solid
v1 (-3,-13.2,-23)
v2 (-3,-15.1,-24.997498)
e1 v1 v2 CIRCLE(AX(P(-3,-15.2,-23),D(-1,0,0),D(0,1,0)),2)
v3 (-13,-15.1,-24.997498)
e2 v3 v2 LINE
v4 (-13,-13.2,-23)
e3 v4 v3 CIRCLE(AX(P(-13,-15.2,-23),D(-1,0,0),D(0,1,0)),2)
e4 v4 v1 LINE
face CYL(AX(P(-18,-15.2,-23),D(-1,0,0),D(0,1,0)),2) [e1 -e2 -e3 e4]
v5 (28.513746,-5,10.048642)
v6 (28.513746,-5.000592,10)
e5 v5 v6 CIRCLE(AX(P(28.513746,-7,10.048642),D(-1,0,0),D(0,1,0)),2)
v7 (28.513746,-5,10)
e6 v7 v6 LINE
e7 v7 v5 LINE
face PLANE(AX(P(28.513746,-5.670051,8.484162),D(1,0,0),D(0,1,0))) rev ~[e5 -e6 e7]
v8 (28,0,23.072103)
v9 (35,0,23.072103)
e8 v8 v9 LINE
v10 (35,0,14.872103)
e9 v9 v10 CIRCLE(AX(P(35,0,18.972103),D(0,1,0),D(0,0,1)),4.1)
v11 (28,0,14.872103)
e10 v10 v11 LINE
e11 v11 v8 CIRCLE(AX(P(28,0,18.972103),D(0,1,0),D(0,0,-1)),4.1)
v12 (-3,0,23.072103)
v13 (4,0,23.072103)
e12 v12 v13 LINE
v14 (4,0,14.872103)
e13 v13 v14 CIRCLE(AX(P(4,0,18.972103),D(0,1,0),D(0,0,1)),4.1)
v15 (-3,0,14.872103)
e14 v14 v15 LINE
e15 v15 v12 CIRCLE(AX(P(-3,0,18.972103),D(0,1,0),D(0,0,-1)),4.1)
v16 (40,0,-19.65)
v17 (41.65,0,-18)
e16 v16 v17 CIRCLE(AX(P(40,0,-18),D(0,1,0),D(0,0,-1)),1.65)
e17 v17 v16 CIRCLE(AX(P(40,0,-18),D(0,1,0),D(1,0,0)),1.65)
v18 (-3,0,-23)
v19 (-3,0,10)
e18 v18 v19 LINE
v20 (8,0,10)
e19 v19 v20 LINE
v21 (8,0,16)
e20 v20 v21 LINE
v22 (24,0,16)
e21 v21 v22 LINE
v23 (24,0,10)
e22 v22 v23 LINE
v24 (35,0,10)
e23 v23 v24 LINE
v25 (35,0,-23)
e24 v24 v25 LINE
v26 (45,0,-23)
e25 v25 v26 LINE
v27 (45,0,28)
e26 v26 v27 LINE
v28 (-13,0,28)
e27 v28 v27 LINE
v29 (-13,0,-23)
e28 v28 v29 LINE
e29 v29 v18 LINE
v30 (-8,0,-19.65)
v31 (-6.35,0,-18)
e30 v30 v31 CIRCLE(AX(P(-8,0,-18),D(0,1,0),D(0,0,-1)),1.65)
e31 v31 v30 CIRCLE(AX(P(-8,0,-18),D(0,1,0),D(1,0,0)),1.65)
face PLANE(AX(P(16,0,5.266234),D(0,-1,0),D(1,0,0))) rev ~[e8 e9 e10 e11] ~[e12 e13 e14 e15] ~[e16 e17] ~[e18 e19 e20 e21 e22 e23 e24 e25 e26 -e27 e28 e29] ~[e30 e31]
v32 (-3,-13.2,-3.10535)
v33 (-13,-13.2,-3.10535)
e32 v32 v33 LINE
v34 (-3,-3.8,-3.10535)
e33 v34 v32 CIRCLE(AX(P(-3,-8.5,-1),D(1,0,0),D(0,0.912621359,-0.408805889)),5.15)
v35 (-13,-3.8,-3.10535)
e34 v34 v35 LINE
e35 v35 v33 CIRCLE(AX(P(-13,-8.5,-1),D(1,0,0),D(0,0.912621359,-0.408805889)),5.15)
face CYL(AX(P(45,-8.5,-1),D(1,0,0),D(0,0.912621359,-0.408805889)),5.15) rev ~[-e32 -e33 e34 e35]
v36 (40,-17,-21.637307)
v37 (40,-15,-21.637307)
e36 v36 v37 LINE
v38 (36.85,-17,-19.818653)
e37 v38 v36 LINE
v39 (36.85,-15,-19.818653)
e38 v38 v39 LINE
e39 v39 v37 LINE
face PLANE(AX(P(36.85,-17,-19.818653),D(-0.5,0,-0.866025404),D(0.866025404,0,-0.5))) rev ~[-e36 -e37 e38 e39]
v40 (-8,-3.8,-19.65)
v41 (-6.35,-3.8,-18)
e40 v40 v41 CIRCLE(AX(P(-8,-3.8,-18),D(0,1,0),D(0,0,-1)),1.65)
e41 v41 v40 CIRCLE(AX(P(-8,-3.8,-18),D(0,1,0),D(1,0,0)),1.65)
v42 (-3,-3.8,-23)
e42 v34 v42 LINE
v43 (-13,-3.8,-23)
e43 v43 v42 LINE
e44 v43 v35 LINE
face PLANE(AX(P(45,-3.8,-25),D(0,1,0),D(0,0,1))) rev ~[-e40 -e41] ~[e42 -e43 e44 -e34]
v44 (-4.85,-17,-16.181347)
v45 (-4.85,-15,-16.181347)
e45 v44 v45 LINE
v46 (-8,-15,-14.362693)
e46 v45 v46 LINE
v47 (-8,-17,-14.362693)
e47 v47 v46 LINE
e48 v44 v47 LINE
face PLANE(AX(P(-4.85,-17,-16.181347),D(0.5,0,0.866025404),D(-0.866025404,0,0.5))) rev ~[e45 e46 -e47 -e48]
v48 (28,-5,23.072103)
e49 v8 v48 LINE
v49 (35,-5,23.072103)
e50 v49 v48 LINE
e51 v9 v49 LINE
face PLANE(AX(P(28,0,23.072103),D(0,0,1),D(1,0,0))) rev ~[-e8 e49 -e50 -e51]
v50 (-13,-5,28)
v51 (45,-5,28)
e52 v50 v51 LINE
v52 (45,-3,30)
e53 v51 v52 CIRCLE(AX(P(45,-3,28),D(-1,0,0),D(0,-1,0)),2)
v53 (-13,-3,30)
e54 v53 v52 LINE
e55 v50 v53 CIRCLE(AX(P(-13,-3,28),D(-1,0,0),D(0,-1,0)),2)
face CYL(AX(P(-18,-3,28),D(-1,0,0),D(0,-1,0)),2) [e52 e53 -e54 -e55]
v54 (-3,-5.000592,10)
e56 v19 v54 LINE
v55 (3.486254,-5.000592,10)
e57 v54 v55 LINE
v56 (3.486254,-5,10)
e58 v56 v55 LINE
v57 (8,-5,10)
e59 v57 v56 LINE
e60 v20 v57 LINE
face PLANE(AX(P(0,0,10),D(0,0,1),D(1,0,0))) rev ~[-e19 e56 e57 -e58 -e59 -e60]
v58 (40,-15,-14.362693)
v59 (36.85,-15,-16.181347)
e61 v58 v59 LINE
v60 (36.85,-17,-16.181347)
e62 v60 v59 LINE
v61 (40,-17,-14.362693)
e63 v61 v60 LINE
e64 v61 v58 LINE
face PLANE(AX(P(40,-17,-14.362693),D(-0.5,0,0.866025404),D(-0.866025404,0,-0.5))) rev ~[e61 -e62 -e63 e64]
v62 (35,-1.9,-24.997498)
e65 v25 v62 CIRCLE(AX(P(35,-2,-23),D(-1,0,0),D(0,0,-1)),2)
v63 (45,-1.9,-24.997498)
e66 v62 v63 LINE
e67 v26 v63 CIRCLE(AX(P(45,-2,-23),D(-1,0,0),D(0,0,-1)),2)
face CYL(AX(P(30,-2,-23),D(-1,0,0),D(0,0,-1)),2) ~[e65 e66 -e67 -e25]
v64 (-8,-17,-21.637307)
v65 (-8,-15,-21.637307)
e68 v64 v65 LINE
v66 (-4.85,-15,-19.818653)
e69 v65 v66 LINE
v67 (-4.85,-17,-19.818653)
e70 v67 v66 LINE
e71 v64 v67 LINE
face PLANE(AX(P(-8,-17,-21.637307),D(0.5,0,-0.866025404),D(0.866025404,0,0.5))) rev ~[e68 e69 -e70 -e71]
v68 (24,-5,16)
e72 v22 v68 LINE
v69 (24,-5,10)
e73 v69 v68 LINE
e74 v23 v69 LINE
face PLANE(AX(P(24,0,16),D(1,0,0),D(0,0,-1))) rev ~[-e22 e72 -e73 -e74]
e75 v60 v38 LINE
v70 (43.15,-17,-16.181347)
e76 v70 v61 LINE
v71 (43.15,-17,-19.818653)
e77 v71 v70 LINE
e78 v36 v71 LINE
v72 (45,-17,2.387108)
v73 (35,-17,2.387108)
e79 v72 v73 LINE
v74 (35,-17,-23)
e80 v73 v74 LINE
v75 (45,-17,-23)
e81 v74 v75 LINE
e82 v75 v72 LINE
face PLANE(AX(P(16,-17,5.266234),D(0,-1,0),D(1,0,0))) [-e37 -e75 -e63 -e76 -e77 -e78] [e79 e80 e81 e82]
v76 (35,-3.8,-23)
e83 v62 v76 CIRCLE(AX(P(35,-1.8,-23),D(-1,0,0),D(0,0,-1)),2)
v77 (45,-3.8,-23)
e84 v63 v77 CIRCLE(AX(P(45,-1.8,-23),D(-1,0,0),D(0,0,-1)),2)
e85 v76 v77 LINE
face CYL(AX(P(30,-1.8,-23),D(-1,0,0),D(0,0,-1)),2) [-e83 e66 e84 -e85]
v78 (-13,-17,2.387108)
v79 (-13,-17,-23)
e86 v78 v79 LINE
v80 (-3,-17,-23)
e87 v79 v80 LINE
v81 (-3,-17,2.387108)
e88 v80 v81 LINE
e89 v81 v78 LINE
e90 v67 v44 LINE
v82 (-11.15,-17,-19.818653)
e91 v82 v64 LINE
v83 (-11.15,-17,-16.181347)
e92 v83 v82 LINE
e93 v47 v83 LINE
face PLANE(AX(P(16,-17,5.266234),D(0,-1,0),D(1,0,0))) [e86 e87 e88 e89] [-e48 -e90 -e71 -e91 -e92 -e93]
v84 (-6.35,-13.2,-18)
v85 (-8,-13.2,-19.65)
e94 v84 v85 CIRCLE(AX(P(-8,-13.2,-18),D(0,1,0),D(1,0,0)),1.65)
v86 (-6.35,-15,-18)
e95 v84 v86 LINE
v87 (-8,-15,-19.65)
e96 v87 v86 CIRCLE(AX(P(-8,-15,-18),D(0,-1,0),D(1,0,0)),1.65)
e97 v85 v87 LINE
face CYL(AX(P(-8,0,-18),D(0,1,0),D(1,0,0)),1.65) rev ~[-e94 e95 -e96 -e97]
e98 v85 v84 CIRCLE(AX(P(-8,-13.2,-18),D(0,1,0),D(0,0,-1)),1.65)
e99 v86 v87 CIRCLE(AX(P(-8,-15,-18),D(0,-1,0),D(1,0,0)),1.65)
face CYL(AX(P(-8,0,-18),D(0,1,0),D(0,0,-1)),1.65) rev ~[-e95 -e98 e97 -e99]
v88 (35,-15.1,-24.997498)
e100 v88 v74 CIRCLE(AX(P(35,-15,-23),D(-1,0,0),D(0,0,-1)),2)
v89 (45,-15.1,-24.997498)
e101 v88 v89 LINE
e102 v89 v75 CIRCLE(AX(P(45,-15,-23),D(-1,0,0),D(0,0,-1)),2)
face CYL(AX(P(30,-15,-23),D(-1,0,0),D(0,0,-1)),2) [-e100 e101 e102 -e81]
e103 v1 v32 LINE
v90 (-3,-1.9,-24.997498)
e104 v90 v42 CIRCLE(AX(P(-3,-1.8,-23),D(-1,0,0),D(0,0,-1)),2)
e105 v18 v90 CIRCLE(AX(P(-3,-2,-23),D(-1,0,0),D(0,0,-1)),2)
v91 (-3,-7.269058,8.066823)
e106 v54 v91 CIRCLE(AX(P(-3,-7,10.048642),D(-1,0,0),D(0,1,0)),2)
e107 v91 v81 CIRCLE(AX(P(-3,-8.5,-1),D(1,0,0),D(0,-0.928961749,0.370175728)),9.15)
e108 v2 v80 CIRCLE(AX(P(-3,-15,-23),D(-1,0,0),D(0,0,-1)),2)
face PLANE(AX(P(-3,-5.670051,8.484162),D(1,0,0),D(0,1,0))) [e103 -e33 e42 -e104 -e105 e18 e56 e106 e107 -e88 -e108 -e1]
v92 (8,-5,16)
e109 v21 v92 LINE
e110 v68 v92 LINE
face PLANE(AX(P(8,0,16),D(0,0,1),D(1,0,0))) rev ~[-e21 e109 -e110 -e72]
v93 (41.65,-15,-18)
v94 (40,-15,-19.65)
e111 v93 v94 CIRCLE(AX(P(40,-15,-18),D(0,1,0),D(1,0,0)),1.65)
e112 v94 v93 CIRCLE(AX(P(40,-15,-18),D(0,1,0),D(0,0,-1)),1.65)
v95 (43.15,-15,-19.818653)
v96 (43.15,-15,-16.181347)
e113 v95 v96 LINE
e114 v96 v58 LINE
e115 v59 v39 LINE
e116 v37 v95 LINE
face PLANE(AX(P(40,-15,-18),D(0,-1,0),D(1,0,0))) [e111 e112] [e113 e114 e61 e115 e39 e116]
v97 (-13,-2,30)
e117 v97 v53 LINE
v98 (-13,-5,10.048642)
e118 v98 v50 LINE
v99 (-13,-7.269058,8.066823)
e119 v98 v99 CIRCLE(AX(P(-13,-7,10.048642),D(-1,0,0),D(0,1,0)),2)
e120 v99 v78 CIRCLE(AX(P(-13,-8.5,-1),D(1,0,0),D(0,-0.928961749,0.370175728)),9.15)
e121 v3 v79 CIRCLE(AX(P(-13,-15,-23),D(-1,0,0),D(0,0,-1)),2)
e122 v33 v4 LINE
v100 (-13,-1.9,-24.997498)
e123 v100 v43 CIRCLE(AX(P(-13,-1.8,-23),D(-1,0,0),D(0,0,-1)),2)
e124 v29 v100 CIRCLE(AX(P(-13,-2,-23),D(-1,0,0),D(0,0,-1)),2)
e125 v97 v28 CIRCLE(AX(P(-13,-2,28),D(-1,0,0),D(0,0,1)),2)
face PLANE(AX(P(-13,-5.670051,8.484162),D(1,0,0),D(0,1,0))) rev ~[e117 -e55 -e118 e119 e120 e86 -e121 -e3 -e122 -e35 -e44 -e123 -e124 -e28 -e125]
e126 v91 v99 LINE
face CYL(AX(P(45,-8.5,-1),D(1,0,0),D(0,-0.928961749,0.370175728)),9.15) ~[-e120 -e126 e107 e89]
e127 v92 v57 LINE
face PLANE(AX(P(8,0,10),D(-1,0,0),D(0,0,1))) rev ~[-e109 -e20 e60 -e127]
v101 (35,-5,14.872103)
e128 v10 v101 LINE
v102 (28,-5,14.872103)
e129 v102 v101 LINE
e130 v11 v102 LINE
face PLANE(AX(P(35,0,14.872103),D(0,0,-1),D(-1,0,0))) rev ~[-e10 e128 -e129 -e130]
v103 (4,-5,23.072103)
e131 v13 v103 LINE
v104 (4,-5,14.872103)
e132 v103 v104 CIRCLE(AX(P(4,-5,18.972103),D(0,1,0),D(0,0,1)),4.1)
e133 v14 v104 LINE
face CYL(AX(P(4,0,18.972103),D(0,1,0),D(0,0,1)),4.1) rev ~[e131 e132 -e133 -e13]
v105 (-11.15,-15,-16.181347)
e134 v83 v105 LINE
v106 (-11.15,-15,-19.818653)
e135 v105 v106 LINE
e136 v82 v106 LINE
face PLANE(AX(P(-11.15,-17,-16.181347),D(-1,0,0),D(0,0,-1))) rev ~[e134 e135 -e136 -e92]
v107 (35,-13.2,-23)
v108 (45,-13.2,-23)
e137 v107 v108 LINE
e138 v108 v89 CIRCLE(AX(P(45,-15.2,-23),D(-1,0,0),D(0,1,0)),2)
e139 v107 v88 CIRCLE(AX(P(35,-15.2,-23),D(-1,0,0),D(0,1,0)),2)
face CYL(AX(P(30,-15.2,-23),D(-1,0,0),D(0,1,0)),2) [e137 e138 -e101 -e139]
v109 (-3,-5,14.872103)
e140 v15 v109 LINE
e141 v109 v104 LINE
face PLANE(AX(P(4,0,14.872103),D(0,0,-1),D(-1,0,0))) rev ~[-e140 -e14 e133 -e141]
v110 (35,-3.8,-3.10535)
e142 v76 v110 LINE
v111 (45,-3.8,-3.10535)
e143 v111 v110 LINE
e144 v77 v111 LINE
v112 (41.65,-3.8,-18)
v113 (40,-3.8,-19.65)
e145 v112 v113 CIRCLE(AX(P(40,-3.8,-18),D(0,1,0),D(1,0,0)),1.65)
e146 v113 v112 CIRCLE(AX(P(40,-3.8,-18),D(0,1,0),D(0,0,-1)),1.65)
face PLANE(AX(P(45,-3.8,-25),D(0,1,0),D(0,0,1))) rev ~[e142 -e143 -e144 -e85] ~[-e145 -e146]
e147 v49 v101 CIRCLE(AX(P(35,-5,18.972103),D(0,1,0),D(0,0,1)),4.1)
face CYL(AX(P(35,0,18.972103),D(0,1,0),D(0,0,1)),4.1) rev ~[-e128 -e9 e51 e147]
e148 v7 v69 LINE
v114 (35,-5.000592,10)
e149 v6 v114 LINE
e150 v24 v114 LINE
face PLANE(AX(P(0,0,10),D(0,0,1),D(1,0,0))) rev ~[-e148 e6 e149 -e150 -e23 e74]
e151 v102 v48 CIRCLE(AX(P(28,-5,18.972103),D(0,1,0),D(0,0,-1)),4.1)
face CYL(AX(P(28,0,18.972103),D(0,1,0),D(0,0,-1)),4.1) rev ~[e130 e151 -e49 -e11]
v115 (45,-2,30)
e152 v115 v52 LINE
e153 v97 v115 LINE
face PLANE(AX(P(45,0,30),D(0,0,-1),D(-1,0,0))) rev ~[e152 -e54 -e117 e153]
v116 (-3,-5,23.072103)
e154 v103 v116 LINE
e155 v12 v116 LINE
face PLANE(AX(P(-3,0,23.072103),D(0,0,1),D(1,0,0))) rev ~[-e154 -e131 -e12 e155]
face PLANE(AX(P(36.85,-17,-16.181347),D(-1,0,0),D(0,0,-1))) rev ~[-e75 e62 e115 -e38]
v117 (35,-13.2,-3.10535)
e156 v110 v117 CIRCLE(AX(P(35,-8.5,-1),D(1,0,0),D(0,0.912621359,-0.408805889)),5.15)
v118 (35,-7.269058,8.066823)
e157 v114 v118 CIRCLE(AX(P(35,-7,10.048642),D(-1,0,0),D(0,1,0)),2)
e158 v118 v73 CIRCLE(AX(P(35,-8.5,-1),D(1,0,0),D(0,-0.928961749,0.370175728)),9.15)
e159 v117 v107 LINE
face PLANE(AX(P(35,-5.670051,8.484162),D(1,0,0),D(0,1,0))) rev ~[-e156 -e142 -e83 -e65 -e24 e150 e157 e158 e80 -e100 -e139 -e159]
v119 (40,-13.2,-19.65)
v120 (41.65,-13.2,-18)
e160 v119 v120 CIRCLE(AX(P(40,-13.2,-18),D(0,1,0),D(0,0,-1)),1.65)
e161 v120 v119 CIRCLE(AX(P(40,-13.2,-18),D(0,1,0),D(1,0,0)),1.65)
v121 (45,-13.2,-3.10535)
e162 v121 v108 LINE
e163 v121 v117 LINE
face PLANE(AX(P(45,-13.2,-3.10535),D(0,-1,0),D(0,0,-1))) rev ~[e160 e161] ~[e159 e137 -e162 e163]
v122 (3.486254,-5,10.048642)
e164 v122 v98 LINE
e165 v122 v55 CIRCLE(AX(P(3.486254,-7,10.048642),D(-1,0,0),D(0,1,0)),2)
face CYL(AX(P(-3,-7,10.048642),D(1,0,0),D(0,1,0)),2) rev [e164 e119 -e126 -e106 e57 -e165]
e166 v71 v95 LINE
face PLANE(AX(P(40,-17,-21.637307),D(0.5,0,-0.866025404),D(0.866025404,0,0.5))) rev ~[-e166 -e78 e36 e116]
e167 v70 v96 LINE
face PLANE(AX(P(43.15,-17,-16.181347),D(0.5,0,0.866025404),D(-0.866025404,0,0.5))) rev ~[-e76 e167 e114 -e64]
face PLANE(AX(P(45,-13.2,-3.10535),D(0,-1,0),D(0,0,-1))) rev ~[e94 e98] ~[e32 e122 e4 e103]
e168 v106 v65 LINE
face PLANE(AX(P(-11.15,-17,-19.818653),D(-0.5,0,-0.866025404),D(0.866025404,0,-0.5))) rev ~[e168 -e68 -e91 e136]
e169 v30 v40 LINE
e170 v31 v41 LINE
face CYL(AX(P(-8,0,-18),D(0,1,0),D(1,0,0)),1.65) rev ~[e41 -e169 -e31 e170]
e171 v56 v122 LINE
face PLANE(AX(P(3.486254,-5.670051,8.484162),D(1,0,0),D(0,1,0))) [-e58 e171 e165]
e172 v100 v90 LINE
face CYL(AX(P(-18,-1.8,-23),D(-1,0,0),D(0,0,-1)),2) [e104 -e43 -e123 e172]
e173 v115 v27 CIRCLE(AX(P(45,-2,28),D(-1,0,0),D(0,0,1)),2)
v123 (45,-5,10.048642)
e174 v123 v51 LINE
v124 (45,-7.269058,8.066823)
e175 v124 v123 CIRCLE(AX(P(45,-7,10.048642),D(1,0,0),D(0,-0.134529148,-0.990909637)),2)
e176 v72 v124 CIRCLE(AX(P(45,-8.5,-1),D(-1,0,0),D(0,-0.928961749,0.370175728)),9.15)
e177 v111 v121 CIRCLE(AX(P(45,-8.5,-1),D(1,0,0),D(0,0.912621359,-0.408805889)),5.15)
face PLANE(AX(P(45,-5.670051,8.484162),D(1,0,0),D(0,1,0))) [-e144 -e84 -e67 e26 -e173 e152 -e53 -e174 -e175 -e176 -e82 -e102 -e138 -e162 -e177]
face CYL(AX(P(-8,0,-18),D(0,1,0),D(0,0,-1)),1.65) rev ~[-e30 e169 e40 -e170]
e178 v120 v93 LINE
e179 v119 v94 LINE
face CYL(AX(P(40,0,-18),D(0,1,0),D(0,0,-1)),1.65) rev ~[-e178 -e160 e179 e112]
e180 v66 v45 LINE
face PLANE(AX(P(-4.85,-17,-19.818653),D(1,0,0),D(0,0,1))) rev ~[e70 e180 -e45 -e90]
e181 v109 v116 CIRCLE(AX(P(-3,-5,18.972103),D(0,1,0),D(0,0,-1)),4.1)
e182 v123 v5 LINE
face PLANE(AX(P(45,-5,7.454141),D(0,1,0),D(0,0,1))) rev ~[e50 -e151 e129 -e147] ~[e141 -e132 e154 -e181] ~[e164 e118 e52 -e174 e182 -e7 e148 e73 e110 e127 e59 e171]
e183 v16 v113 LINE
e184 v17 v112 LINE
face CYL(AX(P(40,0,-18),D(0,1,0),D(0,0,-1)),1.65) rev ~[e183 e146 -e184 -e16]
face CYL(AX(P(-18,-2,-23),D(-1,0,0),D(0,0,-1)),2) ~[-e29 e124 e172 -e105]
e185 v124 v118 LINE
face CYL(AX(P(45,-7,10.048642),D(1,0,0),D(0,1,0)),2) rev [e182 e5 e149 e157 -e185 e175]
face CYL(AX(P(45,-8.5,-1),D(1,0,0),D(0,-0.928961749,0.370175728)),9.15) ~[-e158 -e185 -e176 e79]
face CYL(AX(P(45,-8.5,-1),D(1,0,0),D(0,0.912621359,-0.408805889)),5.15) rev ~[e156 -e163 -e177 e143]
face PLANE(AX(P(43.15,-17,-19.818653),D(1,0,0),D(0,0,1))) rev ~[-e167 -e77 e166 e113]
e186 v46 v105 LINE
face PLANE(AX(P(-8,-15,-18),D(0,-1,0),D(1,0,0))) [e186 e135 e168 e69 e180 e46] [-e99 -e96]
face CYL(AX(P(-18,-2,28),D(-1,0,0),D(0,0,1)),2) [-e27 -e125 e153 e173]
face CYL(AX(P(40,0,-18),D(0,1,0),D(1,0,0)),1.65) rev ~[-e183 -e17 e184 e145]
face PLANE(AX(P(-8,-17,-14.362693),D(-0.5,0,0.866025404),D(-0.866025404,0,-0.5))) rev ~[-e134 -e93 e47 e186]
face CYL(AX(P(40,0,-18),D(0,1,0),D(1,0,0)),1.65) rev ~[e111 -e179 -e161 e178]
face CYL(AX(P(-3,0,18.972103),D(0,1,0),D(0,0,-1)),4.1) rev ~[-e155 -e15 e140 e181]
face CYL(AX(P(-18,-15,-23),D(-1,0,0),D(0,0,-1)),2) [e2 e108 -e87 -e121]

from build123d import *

# Parameters (mm, degrees)
F1_DEPTH     = 17
F3_DEPTH     = 80
F4_T4_DEPTH  = 16.4862536334
F4_T10_DEPTH = 10
F4_T15_DEPTH = 10
F4_T20_DEPTH = 10
F4_T25_DEPTH = 10
F4_T30_DEPTH = 16.4862536334
F4_T33_DEPTH = 68
F4_T35_DEPTH = 20
F4_T37_DEPTH = 20
F5_R         = 1.65
F6_DEPTH     = 2


# Not quite as in the source:
# - a fillet or chamfer that OpenCascade refuses, or shapes differently, is made with other operations: its cross-section is extruded or revolved along the edge and cut away or added


with BuildPart() as f1:
    # F0 (on Front) → F1 (new body)
    with BuildSketch(Plane.XZ):
        Polygon((-13, 18.9721025527), (-13, -25), (-8, -25), (-3, -25), (-3, -5), (-3, 0), (-3, 5), (-3, 10), (8, 10), (8, 16), (24, 16), (24, 10), (35, 10), (35, 5), (35, 0), (35, -5), (35, -25), (40, -25), (45, -25), (45, 25), (45, 30), (-13, 30), (-13, 25), align=None)
        Polygon((-4.9, -19.7897858345), (-8, -21.579571669), (-11.1, -19.7897858345), (-11.1, -16.2102141655), (-8, -14.420428331), (-4.9, -16.2102141655), align=None, mode=Mode.SUBTRACT)
        Polygon((43.1, -19.7897858345), (40, -21.579571669), (36.9, -19.7897858345), (36.9, -16.2102141655), (40, -14.420428331), (43.1, -16.2102141655), align=None, mode=Mode.SUBTRACT)
        with BuildLine():
            ThreePointArc((-3, 14.8721025527), (-7.1, 18.9721025527), (-3, 23.0721025527))
            Line((-3, 23.0721025527), (4, 23.0721025527))
            ThreePointArc((4, 23.0721025527), (8.1, 18.9721025527), (4, 14.8721025527))
            Line((4, 14.8721025527), (-3, 14.8721025527))
        make_face(mode=Mode.SUBTRACT)
        with BuildLine():
            ThreePointArc((28, 14.8721025527), (23.9, 18.9721025527), (28, 23.0721025527))
            Line((28, 23.0721025527), (35, 23.0721025527))
            ThreePointArc((35, 23.0721025527), (39.1, 18.9721025527), (35, 14.8721025527))
            Line((35, 14.8721025527), (28, 14.8721025527))
        make_face(mode=Mode.SUBTRACT)
        Polygon((36.9, -19.7897858345), (40, -21.579571669), (43.1, -19.7897858345), (43.1, -16.2102141655), (40, -14.420428331), (36.9, -16.2102141655), align=None)
        with BuildLine():
            ThreePointArc((41.65, -18), (41.166726189, -19.166726189), (40, -19.65))
            ThreePointArc((40, -19.65), (38.833273811, -16.833273811), (41.65, -18))
        make_face(mode=Mode.SUBTRACT)
        Polygon((-11.1, -19.7897858345), (-8, -21.579571669), (-4.9, -19.7897858345), (-4.9, -16.2102141655), (-8, -14.420428331), (-11.1, -16.2102141655), align=None)
        with BuildLine():
            ThreePointArc((-6.35, -18), (-6.833273811, -19.166726189), (-8, -19.65))
            ThreePointArc((-8, -19.65), (-9.166726189, -16.833273811), (-6.35, -18))
        make_face(mode=Mode.SUBTRACT)
    extrude(amount=F1_DEPTH)

    # F2 (on face) → F3 (cut)
    with BuildSketch(Plane.YZ.offset(45)):
        with BuildLine():
            Line((-17, 30), (-17, 2.3871079109))
            ThreePointArc((-17, 2.3871079109), (-12.0593125845, 7.429341251), (-5, 7.4541409972))
            Line((-5, 7.4541409972), (-5, 30))
            Line((-5, 30), (-17, 30))
        make_face()
        with BuildLine():
            Line((-3.8, -25), (-3.8, -3.1053503271))
            ThreePointArc((-3.8, -3.1053503271), (-8.5, 4.15), (-13.2, -3.1053503271))
            Line((-13.2, -3.1053503271), (-13.2, -25))
            Line((-13.2, -25), (-4, -25))
            Line((-4, -25), (-3.8, -25))
        make_face()
    extrude(amount=-F3_DEPTH, mode=Mode.SUBTRACT)

    # F4: fillet of radius 2 on 12 edges, made by hand


with BuildPart() as f4_tool2:
    # F4_s3 → F4_t4 (new body)
    with BuildSketch(Plane.YZ.offset(3.4862536334)):
        with BuildLine():
            ThreePointArc((-5, 10.0486424505), (-5.6843474227, 8.5423030811), (-7.269058296, 8.0668231769))
            ThreePointArc((-7.269058296, 8.0668231769), (-6.1147752276, 7.8336404039), (-5, 7.4541409972))
            Line((-5, 7.4541409972), (-5, 10.0486424505))
        make_face()
    extrude(amount=-F4_T4_DEPTH)

    split(bisect_by=Plane.YZ.offset(-3), keep=Keep.TOP)

    split(bisect_by=Plane.XY.offset(10), keep=Keep.TOP)


with BuildPart() as f1_1:
    add(f1.part)

    # F4_t1: union F4_tool2
    add(f4_tool2.part)


with BuildPart() as f4_tool8:
    # F4_s9 → F4_t10 (new body)
    with BuildSketch(Plane.YZ.offset(-3)):
        with BuildLine():
            ThreePointArc((-5, 10.0486424505), (-5.6843474227, 8.5423030811), (-7.269058296, 8.0668231769))
            ThreePointArc((-7.269058296, 8.0668231769), (-6.1147752276, 7.8336404039), (-5, 7.4541409972))
            Line((-5, 7.4541409972), (-5, 10.0486424505))
        make_face()
    extrude(amount=-F4_T10_DEPTH)

    split(bisect_by=Plane.XY.offset(10), keep=Keep.TOP)


with BuildPart() as f1_2:
    add(f1_1.part)

    # F4_t7: union F4_tool8
    add(f4_tool8.part)


with BuildPart() as f4_tool13:
    # F4_s14 → F4_t15 (new body)
    with BuildSketch(Plane.YZ.offset(-3)):
        with BuildLine():
            ThreePointArc((-5, 10.0486424505), (-5.6843474227, 8.5423030811), (-7.269058296, 8.0668231769))
            ThreePointArc((-7.269058296, 8.0668231769), (-6.1147752276, 7.8336404039), (-5, 7.4541409972))
            Line((-5, 7.4541409972), (-5, 10.0486424505))
        make_face()
    extrude(amount=-F4_T15_DEPTH)

    split(bisect_by=Plane.XY.offset(10), keep=Keep.BOTTOM)


with BuildPart() as f1_3:
    add(f1_2.part)

    # F4_t12: union F4_tool13
    add(f4_tool13.part)


with BuildPart() as f4_tool18:
    # F4_s19 → F4_t20 (new body)
    with BuildSketch(Plane.YZ.offset(45)):
        with BuildLine():
            ThreePointArc((-5, 10.0486424505), (-5.6843474227, 8.5423030811), (-7.269058296, 8.0668231769))
            ThreePointArc((-7.269058296, 8.0668231769), (-6.1147752276, 7.8336404039), (-5, 7.4541409972))
            Line((-5, 7.4541409972), (-5, 10.0486424505))
        make_face()
    extrude(amount=-F4_T20_DEPTH)

    split(bisect_by=Plane.XY.offset(10), keep=Keep.TOP)


with BuildPart() as f1_4:
    add(f1_3.part)

    # F4_t17: union F4_tool18
    add(f4_tool18.part)


with BuildPart() as f4_tool23:
    # F4_s24 → F4_t25 (new body)
    with BuildSketch(Plane.YZ.offset(45)):
        with BuildLine():
            ThreePointArc((-5, 10.0486424505), (-5.6843474227, 8.5423030811), (-7.269058296, 8.0668231769))
            ThreePointArc((-7.269058296, 8.0668231769), (-6.1147752276, 7.8336404039), (-5, 7.4541409972))
            Line((-5, 7.4541409972), (-5, 10.0486424505))
        make_face()
    extrude(amount=-F4_T25_DEPTH)

    split(bisect_by=Plane.XY.offset(10), keep=Keep.BOTTOM)


with BuildPart() as f1_5:
    add(f1_4.part)

    # F4_t22: union F4_tool23
    add(f4_tool23.part)


with BuildPart() as f4_tool28:
    # F4_s29 → F4_t30 (new body)
    with BuildSketch(Plane.YZ.offset(45)):
        with BuildLine():
            ThreePointArc((-5, 10.0486424505), (-5.6843474227, 8.5423030811), (-7.269058296, 8.0668231769))
            ThreePointArc((-7.269058296, 8.0668231769), (-6.1147752276, 7.8336404039), (-5, 7.4541409972))
            Line((-5, 7.4541409972), (-5, 10.0486424505))
        make_face()
    extrude(amount=-F4_T30_DEPTH)

    split(bisect_by=Plane.XY.offset(10), keep=Keep.TOP)

    split(bisect_by=Plane.YZ.offset(35), keep=Keep.BOTTOM)


with BuildPart() as f1_6:
    add(f1_5.part)

    # F4_t27: union F4_tool28
    add(f4_tool28.part)

    # F4_s34 → F4_t33 (cut)
    with BuildSketch(Plane.YZ.offset(-18)):
        with BuildLine():
            ThreePointArc((-5, 28), (-4.4142135624, 29.4142135624), (-3, 30))
            Line((-3, 30), (-5, 30))
            Line((-5, 30), (-5, 28))
        make_face()
        with BuildLine():
            ThreePointArc((-2, 30), (-0.5857864376, 29.4142135624), (0, 28))
            Line((0, 28), (0, 30))
            Line((0, 30), (-2, 30))
        make_face()
    extrude(amount=F4_T33_DEPTH, mode=Mode.SUBTRACT)

    # F4_s36 → F4_t35 (cut)
    with BuildSketch(Plane.YZ.offset(30)):
        with BuildLine():
            ThreePointArc((-15, -25), (-16.4142135624, -24.4142135624), (-17, -23))
            Line((-17, -23), (-17, -25))
            Line((-17, -25), (-15, -25))
        make_face()
        with BuildLine():
            ThreePointArc((-13.2, -23), (-13.7857864376, -24.4142135624), (-15.2, -25))
            Line((-15.2, -25), (-13.2, -25))
            Line((-13.2, -25), (-13.2, -23))
        make_face()
        with BuildLine():
            ThreePointArc((-1.8, -25), (-3.2142135624, -24.4142135624), (-3.8, -23))
            Line((-3.8, -23), (-3.8, -25))
            Line((-3.8, -25), (-1.8, -25))
        make_face()
        with BuildLine():
            ThreePointArc((-2, -25), (-0.5857864376, -24.4142135624), (0, -23))
            Line((0, -23), (0, -25))
            Line((0, -25), (-2, -25))
        make_face()
    extrude(amount=F4_T35_DEPTH, mode=Mode.SUBTRACT)

    # F4_s38 → F4_t37 (cut)
    with BuildSketch(Plane.YZ.offset(-18)):
        with BuildLine():
            ThreePointArc((-15, -25), (-16.4142135624, -24.4142135624), (-17, -23))
            Line((-17, -23), (-17, -25))
            Line((-17, -25), (-15, -25))
        make_face()
        with BuildLine():
            ThreePointArc((-13.2, -23), (-13.7857864376, -24.4142135624), (-15.2, -25))
            Line((-15.2, -25), (-13.2, -25))
            Line((-13.2, -25), (-13.2, -23))
        make_face()
        with BuildLine():
            ThreePointArc((-1.8, -25), (-3.2142135624, -24.4142135624), (-3.8, -23))
            Line((-3.8, -23), (-3.8, -25))
            Line((-3.8, -25), (-1.8, -25))
        make_face()
        with BuildLine():
            ThreePointArc((-2, -25), (-0.5857864376, -24.4142135624), (0, -23))
            Line((0, -23), (0, -25))
            Line((0, -25), (-2, -25))
        make_face()
    extrude(amount=F4_T37_DEPTH, mode=Mode.SUBTRACT)

    # F5 (on face) → F6 (cut)
    with BuildSketch(Plane.XZ.offset(17)):
        Polygon((-4.85, -19.8186533479), (-4.85, -16.1813466521), (-8, -14.3626933041), (-11.15, -16.1813466521), (-11.15, -19.8186533479), (-8, -21.6373066959), align=None)
        with Locations((-8, -18)):
            Circle(F5_R, mode=Mode.SUBTRACT)
        Polygon((36.85, -16.1813466521), (36.85, -19.8186533479), (40, -21.6373066959), (43.15, -19.8186533479), (43.15, -16.1813466521), (40, -14.3626933041), align=None)
    extrude(amount=-F6_DEPTH, mode=Mode.SUBTRACT)


solid = f1_6.part
